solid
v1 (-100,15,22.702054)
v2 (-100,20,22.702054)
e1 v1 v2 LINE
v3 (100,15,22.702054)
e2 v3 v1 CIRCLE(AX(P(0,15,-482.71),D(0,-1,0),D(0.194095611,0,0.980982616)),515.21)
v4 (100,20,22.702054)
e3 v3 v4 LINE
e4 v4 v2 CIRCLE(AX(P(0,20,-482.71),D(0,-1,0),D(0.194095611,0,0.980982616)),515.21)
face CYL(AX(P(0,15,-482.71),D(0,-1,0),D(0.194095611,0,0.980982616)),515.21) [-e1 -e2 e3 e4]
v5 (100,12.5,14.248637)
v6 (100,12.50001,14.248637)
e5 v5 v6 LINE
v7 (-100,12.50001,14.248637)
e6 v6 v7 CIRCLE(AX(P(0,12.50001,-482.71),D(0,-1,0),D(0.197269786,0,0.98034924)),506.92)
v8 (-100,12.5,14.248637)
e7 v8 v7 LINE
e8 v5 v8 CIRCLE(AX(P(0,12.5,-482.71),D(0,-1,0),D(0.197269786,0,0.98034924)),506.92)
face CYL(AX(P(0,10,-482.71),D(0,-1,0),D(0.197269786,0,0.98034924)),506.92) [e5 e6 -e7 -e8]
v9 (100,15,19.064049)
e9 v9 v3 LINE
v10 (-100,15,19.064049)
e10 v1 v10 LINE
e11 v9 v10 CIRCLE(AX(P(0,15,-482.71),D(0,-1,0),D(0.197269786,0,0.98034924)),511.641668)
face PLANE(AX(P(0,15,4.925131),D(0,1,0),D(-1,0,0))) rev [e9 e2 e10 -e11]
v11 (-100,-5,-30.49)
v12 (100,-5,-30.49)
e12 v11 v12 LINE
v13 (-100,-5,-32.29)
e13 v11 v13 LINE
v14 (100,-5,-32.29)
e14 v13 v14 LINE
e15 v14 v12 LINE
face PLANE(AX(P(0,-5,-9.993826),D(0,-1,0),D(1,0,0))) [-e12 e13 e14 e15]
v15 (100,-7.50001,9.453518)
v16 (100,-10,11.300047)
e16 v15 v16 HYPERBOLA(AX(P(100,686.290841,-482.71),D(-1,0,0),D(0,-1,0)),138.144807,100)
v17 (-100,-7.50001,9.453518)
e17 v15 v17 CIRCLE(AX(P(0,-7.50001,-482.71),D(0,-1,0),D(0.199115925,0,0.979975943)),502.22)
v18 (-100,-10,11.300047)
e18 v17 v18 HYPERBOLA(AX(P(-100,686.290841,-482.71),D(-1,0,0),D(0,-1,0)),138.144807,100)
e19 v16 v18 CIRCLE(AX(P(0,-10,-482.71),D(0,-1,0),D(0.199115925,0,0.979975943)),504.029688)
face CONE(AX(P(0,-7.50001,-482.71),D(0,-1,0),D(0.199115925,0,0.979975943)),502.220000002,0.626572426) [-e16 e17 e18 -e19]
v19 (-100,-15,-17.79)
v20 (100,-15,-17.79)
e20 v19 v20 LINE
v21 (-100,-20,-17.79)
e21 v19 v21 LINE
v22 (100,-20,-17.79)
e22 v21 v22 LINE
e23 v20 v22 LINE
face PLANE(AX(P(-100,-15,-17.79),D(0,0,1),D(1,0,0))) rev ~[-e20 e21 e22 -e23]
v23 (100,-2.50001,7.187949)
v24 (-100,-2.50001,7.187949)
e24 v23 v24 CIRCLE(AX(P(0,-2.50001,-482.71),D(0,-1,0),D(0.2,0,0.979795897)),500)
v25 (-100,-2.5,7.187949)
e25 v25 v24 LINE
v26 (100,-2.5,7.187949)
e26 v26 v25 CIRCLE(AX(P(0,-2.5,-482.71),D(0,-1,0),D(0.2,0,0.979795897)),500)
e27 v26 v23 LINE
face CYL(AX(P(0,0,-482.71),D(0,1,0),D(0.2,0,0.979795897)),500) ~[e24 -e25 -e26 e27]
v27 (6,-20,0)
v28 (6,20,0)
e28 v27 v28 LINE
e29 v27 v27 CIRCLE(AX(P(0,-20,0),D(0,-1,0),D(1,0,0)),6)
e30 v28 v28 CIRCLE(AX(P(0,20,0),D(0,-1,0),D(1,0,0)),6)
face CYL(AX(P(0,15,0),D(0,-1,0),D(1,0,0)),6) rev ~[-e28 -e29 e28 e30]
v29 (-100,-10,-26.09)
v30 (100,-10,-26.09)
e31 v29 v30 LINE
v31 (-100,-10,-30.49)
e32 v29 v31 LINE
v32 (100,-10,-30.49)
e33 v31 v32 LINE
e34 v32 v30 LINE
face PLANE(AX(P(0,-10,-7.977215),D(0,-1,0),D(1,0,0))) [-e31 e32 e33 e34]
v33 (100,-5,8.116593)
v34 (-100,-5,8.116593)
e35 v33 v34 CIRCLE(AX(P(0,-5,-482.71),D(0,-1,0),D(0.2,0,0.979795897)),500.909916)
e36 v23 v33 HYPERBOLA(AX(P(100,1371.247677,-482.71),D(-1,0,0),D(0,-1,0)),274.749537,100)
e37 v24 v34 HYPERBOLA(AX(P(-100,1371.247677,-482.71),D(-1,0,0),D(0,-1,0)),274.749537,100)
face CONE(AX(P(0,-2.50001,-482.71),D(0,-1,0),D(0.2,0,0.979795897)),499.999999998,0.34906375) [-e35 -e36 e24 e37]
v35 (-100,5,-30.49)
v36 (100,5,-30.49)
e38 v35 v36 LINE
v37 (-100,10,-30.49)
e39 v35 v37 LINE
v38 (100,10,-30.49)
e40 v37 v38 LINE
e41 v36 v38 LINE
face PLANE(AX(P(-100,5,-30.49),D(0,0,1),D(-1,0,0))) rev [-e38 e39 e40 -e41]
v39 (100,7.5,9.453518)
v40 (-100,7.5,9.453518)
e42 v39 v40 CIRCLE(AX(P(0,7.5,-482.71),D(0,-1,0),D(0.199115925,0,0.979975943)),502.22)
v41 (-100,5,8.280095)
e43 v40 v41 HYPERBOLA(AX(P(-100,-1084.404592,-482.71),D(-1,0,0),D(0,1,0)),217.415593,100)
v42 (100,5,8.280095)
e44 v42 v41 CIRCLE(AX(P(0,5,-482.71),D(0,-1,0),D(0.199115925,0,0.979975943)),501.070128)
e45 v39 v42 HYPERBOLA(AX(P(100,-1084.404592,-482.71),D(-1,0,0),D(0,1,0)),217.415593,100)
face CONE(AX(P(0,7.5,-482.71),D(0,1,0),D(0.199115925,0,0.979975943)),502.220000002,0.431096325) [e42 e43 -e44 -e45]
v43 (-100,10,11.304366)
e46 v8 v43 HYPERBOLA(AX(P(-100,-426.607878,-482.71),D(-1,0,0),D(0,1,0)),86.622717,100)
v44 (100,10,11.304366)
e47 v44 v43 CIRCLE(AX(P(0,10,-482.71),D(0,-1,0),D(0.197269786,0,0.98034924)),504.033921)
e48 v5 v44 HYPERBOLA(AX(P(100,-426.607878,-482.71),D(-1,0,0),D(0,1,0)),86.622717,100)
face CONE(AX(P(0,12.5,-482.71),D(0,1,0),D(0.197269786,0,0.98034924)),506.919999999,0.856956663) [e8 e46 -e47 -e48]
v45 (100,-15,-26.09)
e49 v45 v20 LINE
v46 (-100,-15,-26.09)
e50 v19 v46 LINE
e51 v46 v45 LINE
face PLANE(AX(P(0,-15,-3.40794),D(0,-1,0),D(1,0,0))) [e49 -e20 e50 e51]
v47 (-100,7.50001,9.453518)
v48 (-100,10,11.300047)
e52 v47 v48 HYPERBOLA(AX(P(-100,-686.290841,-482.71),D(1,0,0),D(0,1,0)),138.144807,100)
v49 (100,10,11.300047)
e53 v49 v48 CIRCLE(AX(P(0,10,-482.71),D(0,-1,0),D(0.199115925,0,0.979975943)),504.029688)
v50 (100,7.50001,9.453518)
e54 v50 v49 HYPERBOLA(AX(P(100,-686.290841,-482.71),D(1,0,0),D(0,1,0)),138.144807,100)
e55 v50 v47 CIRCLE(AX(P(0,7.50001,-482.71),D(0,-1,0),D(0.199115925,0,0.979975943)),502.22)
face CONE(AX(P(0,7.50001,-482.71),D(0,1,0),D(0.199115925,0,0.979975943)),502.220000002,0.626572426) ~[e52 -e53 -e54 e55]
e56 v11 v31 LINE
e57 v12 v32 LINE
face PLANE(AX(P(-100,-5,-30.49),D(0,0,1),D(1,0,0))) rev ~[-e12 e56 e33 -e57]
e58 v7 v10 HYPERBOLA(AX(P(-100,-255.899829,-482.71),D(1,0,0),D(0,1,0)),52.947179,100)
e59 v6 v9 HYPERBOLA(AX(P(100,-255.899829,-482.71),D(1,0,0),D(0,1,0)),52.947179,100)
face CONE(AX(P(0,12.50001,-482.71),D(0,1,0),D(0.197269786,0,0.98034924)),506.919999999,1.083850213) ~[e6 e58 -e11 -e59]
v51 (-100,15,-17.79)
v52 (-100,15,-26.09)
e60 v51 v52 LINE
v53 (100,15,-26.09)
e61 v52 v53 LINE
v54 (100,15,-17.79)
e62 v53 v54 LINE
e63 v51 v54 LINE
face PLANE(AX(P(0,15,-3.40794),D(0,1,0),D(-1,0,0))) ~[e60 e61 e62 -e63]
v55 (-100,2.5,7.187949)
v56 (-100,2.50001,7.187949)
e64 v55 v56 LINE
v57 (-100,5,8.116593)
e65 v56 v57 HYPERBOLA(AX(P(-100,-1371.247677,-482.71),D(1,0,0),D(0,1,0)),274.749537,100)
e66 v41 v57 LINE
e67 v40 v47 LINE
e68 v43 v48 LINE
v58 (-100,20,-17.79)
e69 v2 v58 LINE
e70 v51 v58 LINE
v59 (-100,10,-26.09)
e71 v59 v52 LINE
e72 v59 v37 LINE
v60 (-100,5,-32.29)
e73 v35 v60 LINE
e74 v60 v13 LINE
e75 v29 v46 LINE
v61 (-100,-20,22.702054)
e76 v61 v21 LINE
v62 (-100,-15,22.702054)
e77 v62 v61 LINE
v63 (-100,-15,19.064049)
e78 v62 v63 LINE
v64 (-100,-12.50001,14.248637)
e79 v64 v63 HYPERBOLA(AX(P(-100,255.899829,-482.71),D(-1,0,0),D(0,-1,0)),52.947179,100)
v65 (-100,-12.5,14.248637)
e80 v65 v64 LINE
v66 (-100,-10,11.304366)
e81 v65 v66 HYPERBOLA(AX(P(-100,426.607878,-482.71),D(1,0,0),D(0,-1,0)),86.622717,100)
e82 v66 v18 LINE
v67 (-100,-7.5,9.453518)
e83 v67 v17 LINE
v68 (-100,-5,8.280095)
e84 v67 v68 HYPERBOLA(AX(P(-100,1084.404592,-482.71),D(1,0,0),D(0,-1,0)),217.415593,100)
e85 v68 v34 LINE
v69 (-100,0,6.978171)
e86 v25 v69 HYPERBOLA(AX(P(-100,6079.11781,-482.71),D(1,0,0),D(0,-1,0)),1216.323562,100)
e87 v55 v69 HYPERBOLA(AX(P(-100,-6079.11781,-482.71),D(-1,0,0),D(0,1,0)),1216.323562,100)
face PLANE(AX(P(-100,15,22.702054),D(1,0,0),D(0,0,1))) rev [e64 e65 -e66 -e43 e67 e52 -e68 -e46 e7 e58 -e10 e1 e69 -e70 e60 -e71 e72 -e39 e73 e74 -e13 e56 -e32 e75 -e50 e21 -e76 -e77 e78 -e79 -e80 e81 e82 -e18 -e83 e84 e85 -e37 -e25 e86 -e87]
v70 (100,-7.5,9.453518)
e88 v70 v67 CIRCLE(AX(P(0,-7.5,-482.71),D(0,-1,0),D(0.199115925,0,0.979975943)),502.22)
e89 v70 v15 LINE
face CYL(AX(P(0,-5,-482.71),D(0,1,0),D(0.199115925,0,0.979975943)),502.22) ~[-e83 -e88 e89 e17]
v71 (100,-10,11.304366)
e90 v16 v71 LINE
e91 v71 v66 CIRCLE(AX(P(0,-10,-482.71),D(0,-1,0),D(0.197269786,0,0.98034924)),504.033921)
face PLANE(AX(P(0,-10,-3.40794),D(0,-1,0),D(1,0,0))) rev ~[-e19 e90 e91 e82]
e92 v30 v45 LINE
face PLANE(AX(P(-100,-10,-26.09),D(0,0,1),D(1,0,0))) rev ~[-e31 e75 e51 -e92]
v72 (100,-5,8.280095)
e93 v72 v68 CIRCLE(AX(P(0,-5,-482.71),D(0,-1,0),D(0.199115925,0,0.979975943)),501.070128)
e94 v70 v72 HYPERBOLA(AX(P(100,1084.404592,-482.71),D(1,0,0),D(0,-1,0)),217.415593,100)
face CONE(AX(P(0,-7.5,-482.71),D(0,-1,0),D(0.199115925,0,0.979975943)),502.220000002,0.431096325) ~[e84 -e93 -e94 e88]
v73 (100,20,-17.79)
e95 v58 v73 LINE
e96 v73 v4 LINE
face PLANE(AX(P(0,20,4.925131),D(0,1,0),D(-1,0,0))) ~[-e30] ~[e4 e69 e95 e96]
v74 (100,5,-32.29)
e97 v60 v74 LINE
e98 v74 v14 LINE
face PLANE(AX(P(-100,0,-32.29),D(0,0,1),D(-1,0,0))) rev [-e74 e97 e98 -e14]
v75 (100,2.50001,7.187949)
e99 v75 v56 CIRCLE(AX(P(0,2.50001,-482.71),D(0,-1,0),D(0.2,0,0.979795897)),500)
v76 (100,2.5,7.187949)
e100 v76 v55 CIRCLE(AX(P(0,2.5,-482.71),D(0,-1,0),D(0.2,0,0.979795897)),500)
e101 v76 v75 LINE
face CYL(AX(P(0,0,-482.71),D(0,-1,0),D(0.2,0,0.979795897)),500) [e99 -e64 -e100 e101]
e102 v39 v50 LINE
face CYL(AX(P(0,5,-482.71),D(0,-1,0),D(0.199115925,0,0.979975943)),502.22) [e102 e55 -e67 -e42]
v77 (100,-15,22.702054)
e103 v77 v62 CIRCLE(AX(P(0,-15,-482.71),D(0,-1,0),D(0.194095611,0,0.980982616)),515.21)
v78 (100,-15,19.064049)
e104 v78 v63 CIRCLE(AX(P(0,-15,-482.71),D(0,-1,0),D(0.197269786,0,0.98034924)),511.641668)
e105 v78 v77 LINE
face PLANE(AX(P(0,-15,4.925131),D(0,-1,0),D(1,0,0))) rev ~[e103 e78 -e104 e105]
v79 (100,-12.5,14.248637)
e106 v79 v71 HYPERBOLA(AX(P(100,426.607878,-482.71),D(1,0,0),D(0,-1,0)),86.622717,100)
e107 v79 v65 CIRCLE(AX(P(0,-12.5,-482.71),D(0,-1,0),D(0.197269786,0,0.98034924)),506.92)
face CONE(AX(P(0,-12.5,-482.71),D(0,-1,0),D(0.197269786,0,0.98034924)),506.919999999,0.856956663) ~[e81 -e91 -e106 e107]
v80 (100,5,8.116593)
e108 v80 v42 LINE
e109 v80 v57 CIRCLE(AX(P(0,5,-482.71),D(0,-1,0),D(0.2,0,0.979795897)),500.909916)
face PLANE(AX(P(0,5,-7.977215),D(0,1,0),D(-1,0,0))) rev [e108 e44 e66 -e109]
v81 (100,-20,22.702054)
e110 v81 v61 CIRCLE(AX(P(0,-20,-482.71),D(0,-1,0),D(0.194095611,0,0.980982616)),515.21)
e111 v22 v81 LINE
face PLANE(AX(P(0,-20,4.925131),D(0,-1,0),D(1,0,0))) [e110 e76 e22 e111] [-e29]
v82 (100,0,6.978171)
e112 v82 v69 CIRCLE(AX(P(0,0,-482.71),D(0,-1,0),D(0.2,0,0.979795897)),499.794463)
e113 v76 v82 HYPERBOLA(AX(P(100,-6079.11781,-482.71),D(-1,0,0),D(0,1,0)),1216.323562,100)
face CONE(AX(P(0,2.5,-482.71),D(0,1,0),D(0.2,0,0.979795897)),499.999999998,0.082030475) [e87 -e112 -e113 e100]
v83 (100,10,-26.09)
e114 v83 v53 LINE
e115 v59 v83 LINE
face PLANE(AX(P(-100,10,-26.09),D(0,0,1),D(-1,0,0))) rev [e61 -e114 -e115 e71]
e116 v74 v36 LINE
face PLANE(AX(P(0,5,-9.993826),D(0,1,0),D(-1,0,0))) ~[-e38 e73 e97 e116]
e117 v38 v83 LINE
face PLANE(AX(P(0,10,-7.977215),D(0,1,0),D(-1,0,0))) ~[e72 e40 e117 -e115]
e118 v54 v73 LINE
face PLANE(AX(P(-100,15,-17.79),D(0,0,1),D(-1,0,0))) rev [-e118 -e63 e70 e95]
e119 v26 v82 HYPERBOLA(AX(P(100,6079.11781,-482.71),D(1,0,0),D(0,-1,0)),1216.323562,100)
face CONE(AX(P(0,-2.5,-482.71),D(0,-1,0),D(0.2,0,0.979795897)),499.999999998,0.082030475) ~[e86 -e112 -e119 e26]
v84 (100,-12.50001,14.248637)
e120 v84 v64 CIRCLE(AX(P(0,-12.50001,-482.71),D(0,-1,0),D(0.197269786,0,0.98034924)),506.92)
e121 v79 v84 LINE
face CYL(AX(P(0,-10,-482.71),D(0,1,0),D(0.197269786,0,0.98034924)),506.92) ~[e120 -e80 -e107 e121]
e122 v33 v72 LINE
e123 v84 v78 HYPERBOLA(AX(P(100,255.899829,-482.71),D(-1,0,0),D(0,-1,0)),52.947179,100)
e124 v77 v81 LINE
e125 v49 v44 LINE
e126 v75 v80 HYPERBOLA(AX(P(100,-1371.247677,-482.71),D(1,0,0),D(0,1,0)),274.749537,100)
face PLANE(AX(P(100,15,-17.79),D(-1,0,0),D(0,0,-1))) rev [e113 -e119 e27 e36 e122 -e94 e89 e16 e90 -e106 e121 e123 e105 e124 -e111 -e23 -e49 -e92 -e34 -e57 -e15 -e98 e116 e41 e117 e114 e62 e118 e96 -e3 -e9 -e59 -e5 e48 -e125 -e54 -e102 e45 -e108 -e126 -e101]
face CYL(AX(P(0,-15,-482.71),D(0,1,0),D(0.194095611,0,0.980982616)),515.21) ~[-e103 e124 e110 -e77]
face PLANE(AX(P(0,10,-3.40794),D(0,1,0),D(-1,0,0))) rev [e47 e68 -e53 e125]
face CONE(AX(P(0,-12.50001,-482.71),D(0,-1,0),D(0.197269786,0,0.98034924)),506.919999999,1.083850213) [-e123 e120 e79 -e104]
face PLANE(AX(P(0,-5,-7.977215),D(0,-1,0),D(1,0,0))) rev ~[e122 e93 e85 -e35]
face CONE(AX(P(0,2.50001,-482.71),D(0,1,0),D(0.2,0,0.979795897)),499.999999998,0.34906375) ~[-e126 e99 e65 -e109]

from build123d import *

# Parameters (mm, degrees)
F0_R      = 6
F1_DEPTH  = 5
F2_R      = 6
F3_DEPTH  = 5
F4_R      = 6
F5_DEPTH  = 5
F6_R      = 6
F7_DEPTH  = 5
F8_SIZE2  = 0.2055374144
F8_SIZE   = 2.5
F9_SIZE2  = 1.149871526
F9_SIZE   = 2.5
F10_SIZE2 = 2.8860789389
F10_SIZE  = 2.5
F11_SIZE2 = 0.909916
F11_SIZE  = 2.49999
F12_SIZE2 = 1.809688
F12_SIZE  = 2.49999
F13_SIZE2 = 4.721668
F13_SIZE  = 2.49999


# Not quite as in the source:
# - a fillet or chamfer is up to 0.001 mm smaller than in the source, because OpenCascade refuses the exact size


with BuildPart() as f1:
    # F0 (on Front) → F1 (new body)
    with BuildSketch(Plane.XZ):
        with BuildLine():
            Line((-100, 7.1879485566), (-100, -32.29))
            Line((-100, -32.29), (100, -32.29))
            Line((100, -32.29), (100, 7.1879485566))
            ThreePointArc((100, 7.1879485566), (0, 17.29), (-100, 7.1879485566))
        make_face()
        Circle(F0_R, mode=Mode.SUBTRACT)
    extrude(amount=F1_DEPTH)

    # F2 (on face) → F3 (join)
    with BuildSketch(Plane.XZ.offset(5)):
        with BuildLine():
            Line((-100, -30.49), (100, -30.49))
            Line((100, -30.49), (100, 9.4535179491))
            ThreePointArc((100, 9.4535179491), (0, 19.51), (-100, 9.4535179491))
            Line((-100, 9.4535179491), (-100, -30.49))
        make_face()
        Circle(F2_R, mode=Mode.SUBTRACT)
    extrude(amount=F3_DEPTH)

    # F4 (on face) → F5 (join)
    with BuildSketch(Plane.XZ.offset(10)):
        with BuildLine():
            Line((-100, -26.09), (100, -26.09))
            Line((100, -26.09), (100, 14.2486365081))
            ThreePointArc((100, 14.2486365081), (0, 24.21), (-100, 14.2486365081))
            Line((-100, 14.2486365081), (-100, -26.09))
        make_face()
        Circle(F4_R, mode=Mode.SUBTRACT)
    extrude(amount=F5_DEPTH)

    # F6 (on face) → F7 (join)
    with BuildSketch(Plane.XZ.offset(15)):
        with BuildLine():
            Line((-100, -17.79), (100, -17.79))
            Line((100, -17.79), (100, 22.7020537739))
            ThreePointArc((100, 22.7020537739), (0, 32.5), (-100, 22.7020537739))
            Line((-100, 22.7020537739), (-100, -17.79))
        make_face()
        Circle(F6_R, mode=Mode.SUBTRACT)
    extrude(amount=F7_DEPTH)

    # F8
    f8_edges = [f1.edges().sort_by_distance(p)[0] for p in [
        (0, 0, 17.29),
    ]]
    f8_side = f1.faces().sort_by_distance((0, -2.5, 17.29))[0]
    chamfer(f8_edges, length=F8_SIZE, length2=F8_SIZE2, reference=f8_side)

    # F9
    f9_edges = [f1.edges().sort_by_distance(p)[0] for p in [
        (0, -5, 19.51),
    ]]
    f9_side = f1.faces().sort_by_distance((0, -7.5, 19.51))[0]
    chamfer(f9_edges, length=F9_SIZE, length2=F9_SIZE2, reference=f9_side)

    # F10
    f10_edges = [f1.edges().sort_by_distance(p)[0] for p in [
        (0, -10, 24.21),
    ]]
    f10_side = f1.faces().sort_by_distance((0, -12.5, 24.21))[0]
    chamfer(f10_edges, length=F10_SIZE, length2=F10_SIZE2, reference=f10_side)

    # F11 (size 2.5 and 0.9099255857 in the source; OpenCascade refuses exactly that, so slightly less here)
    f11_edges = [f1.edges().sort_by_distance(p)[0] for p in [
        (0, -5, 17.29),
    ]]
    f11_side = f1.faces().sort_by_distance((0, -3.75, 17.29))[0]
    chamfer(f11_edges, length=F11_SIZE, length2=F11_SIZE2, reference=f11_side)

    # F12 (size 2.5 and 1.8096981916 in the source; OpenCascade refuses exactly that, so slightly less here)
    f12_edges = [f1.edges().sort_by_distance(p)[0] for p in [
        (0, -10, 19.51),
    ]]
    f12_side = f1.faces().sort_by_distance((0, -8.75, 19.51))[0]
    chamfer(f12_edges, length=F12_SIZE, length2=F12_SIZE2, reference=f12_side)

    # F13 (size 2.5 and 4.7216783541 in the source; OpenCascade refuses exactly that, so slightly less here)
    f13_edges = [f1.edges().sort_by_distance(p)[0] for p in [
        (0, -15, 24.21),
    ]]
    f13_side = f1.faces().sort_by_distance((0, -13.75, 24.21))[0]
    chamfer(f13_edges, length=F13_SIZE, length2=F13_SIZE2, reference=f13_side)

    # F14: F1 across plane


with BuildPart() as f1_1:
    add(f1.part)
    add(f1.part.mirror(Plane.XZ))


solid = f1_1.part
